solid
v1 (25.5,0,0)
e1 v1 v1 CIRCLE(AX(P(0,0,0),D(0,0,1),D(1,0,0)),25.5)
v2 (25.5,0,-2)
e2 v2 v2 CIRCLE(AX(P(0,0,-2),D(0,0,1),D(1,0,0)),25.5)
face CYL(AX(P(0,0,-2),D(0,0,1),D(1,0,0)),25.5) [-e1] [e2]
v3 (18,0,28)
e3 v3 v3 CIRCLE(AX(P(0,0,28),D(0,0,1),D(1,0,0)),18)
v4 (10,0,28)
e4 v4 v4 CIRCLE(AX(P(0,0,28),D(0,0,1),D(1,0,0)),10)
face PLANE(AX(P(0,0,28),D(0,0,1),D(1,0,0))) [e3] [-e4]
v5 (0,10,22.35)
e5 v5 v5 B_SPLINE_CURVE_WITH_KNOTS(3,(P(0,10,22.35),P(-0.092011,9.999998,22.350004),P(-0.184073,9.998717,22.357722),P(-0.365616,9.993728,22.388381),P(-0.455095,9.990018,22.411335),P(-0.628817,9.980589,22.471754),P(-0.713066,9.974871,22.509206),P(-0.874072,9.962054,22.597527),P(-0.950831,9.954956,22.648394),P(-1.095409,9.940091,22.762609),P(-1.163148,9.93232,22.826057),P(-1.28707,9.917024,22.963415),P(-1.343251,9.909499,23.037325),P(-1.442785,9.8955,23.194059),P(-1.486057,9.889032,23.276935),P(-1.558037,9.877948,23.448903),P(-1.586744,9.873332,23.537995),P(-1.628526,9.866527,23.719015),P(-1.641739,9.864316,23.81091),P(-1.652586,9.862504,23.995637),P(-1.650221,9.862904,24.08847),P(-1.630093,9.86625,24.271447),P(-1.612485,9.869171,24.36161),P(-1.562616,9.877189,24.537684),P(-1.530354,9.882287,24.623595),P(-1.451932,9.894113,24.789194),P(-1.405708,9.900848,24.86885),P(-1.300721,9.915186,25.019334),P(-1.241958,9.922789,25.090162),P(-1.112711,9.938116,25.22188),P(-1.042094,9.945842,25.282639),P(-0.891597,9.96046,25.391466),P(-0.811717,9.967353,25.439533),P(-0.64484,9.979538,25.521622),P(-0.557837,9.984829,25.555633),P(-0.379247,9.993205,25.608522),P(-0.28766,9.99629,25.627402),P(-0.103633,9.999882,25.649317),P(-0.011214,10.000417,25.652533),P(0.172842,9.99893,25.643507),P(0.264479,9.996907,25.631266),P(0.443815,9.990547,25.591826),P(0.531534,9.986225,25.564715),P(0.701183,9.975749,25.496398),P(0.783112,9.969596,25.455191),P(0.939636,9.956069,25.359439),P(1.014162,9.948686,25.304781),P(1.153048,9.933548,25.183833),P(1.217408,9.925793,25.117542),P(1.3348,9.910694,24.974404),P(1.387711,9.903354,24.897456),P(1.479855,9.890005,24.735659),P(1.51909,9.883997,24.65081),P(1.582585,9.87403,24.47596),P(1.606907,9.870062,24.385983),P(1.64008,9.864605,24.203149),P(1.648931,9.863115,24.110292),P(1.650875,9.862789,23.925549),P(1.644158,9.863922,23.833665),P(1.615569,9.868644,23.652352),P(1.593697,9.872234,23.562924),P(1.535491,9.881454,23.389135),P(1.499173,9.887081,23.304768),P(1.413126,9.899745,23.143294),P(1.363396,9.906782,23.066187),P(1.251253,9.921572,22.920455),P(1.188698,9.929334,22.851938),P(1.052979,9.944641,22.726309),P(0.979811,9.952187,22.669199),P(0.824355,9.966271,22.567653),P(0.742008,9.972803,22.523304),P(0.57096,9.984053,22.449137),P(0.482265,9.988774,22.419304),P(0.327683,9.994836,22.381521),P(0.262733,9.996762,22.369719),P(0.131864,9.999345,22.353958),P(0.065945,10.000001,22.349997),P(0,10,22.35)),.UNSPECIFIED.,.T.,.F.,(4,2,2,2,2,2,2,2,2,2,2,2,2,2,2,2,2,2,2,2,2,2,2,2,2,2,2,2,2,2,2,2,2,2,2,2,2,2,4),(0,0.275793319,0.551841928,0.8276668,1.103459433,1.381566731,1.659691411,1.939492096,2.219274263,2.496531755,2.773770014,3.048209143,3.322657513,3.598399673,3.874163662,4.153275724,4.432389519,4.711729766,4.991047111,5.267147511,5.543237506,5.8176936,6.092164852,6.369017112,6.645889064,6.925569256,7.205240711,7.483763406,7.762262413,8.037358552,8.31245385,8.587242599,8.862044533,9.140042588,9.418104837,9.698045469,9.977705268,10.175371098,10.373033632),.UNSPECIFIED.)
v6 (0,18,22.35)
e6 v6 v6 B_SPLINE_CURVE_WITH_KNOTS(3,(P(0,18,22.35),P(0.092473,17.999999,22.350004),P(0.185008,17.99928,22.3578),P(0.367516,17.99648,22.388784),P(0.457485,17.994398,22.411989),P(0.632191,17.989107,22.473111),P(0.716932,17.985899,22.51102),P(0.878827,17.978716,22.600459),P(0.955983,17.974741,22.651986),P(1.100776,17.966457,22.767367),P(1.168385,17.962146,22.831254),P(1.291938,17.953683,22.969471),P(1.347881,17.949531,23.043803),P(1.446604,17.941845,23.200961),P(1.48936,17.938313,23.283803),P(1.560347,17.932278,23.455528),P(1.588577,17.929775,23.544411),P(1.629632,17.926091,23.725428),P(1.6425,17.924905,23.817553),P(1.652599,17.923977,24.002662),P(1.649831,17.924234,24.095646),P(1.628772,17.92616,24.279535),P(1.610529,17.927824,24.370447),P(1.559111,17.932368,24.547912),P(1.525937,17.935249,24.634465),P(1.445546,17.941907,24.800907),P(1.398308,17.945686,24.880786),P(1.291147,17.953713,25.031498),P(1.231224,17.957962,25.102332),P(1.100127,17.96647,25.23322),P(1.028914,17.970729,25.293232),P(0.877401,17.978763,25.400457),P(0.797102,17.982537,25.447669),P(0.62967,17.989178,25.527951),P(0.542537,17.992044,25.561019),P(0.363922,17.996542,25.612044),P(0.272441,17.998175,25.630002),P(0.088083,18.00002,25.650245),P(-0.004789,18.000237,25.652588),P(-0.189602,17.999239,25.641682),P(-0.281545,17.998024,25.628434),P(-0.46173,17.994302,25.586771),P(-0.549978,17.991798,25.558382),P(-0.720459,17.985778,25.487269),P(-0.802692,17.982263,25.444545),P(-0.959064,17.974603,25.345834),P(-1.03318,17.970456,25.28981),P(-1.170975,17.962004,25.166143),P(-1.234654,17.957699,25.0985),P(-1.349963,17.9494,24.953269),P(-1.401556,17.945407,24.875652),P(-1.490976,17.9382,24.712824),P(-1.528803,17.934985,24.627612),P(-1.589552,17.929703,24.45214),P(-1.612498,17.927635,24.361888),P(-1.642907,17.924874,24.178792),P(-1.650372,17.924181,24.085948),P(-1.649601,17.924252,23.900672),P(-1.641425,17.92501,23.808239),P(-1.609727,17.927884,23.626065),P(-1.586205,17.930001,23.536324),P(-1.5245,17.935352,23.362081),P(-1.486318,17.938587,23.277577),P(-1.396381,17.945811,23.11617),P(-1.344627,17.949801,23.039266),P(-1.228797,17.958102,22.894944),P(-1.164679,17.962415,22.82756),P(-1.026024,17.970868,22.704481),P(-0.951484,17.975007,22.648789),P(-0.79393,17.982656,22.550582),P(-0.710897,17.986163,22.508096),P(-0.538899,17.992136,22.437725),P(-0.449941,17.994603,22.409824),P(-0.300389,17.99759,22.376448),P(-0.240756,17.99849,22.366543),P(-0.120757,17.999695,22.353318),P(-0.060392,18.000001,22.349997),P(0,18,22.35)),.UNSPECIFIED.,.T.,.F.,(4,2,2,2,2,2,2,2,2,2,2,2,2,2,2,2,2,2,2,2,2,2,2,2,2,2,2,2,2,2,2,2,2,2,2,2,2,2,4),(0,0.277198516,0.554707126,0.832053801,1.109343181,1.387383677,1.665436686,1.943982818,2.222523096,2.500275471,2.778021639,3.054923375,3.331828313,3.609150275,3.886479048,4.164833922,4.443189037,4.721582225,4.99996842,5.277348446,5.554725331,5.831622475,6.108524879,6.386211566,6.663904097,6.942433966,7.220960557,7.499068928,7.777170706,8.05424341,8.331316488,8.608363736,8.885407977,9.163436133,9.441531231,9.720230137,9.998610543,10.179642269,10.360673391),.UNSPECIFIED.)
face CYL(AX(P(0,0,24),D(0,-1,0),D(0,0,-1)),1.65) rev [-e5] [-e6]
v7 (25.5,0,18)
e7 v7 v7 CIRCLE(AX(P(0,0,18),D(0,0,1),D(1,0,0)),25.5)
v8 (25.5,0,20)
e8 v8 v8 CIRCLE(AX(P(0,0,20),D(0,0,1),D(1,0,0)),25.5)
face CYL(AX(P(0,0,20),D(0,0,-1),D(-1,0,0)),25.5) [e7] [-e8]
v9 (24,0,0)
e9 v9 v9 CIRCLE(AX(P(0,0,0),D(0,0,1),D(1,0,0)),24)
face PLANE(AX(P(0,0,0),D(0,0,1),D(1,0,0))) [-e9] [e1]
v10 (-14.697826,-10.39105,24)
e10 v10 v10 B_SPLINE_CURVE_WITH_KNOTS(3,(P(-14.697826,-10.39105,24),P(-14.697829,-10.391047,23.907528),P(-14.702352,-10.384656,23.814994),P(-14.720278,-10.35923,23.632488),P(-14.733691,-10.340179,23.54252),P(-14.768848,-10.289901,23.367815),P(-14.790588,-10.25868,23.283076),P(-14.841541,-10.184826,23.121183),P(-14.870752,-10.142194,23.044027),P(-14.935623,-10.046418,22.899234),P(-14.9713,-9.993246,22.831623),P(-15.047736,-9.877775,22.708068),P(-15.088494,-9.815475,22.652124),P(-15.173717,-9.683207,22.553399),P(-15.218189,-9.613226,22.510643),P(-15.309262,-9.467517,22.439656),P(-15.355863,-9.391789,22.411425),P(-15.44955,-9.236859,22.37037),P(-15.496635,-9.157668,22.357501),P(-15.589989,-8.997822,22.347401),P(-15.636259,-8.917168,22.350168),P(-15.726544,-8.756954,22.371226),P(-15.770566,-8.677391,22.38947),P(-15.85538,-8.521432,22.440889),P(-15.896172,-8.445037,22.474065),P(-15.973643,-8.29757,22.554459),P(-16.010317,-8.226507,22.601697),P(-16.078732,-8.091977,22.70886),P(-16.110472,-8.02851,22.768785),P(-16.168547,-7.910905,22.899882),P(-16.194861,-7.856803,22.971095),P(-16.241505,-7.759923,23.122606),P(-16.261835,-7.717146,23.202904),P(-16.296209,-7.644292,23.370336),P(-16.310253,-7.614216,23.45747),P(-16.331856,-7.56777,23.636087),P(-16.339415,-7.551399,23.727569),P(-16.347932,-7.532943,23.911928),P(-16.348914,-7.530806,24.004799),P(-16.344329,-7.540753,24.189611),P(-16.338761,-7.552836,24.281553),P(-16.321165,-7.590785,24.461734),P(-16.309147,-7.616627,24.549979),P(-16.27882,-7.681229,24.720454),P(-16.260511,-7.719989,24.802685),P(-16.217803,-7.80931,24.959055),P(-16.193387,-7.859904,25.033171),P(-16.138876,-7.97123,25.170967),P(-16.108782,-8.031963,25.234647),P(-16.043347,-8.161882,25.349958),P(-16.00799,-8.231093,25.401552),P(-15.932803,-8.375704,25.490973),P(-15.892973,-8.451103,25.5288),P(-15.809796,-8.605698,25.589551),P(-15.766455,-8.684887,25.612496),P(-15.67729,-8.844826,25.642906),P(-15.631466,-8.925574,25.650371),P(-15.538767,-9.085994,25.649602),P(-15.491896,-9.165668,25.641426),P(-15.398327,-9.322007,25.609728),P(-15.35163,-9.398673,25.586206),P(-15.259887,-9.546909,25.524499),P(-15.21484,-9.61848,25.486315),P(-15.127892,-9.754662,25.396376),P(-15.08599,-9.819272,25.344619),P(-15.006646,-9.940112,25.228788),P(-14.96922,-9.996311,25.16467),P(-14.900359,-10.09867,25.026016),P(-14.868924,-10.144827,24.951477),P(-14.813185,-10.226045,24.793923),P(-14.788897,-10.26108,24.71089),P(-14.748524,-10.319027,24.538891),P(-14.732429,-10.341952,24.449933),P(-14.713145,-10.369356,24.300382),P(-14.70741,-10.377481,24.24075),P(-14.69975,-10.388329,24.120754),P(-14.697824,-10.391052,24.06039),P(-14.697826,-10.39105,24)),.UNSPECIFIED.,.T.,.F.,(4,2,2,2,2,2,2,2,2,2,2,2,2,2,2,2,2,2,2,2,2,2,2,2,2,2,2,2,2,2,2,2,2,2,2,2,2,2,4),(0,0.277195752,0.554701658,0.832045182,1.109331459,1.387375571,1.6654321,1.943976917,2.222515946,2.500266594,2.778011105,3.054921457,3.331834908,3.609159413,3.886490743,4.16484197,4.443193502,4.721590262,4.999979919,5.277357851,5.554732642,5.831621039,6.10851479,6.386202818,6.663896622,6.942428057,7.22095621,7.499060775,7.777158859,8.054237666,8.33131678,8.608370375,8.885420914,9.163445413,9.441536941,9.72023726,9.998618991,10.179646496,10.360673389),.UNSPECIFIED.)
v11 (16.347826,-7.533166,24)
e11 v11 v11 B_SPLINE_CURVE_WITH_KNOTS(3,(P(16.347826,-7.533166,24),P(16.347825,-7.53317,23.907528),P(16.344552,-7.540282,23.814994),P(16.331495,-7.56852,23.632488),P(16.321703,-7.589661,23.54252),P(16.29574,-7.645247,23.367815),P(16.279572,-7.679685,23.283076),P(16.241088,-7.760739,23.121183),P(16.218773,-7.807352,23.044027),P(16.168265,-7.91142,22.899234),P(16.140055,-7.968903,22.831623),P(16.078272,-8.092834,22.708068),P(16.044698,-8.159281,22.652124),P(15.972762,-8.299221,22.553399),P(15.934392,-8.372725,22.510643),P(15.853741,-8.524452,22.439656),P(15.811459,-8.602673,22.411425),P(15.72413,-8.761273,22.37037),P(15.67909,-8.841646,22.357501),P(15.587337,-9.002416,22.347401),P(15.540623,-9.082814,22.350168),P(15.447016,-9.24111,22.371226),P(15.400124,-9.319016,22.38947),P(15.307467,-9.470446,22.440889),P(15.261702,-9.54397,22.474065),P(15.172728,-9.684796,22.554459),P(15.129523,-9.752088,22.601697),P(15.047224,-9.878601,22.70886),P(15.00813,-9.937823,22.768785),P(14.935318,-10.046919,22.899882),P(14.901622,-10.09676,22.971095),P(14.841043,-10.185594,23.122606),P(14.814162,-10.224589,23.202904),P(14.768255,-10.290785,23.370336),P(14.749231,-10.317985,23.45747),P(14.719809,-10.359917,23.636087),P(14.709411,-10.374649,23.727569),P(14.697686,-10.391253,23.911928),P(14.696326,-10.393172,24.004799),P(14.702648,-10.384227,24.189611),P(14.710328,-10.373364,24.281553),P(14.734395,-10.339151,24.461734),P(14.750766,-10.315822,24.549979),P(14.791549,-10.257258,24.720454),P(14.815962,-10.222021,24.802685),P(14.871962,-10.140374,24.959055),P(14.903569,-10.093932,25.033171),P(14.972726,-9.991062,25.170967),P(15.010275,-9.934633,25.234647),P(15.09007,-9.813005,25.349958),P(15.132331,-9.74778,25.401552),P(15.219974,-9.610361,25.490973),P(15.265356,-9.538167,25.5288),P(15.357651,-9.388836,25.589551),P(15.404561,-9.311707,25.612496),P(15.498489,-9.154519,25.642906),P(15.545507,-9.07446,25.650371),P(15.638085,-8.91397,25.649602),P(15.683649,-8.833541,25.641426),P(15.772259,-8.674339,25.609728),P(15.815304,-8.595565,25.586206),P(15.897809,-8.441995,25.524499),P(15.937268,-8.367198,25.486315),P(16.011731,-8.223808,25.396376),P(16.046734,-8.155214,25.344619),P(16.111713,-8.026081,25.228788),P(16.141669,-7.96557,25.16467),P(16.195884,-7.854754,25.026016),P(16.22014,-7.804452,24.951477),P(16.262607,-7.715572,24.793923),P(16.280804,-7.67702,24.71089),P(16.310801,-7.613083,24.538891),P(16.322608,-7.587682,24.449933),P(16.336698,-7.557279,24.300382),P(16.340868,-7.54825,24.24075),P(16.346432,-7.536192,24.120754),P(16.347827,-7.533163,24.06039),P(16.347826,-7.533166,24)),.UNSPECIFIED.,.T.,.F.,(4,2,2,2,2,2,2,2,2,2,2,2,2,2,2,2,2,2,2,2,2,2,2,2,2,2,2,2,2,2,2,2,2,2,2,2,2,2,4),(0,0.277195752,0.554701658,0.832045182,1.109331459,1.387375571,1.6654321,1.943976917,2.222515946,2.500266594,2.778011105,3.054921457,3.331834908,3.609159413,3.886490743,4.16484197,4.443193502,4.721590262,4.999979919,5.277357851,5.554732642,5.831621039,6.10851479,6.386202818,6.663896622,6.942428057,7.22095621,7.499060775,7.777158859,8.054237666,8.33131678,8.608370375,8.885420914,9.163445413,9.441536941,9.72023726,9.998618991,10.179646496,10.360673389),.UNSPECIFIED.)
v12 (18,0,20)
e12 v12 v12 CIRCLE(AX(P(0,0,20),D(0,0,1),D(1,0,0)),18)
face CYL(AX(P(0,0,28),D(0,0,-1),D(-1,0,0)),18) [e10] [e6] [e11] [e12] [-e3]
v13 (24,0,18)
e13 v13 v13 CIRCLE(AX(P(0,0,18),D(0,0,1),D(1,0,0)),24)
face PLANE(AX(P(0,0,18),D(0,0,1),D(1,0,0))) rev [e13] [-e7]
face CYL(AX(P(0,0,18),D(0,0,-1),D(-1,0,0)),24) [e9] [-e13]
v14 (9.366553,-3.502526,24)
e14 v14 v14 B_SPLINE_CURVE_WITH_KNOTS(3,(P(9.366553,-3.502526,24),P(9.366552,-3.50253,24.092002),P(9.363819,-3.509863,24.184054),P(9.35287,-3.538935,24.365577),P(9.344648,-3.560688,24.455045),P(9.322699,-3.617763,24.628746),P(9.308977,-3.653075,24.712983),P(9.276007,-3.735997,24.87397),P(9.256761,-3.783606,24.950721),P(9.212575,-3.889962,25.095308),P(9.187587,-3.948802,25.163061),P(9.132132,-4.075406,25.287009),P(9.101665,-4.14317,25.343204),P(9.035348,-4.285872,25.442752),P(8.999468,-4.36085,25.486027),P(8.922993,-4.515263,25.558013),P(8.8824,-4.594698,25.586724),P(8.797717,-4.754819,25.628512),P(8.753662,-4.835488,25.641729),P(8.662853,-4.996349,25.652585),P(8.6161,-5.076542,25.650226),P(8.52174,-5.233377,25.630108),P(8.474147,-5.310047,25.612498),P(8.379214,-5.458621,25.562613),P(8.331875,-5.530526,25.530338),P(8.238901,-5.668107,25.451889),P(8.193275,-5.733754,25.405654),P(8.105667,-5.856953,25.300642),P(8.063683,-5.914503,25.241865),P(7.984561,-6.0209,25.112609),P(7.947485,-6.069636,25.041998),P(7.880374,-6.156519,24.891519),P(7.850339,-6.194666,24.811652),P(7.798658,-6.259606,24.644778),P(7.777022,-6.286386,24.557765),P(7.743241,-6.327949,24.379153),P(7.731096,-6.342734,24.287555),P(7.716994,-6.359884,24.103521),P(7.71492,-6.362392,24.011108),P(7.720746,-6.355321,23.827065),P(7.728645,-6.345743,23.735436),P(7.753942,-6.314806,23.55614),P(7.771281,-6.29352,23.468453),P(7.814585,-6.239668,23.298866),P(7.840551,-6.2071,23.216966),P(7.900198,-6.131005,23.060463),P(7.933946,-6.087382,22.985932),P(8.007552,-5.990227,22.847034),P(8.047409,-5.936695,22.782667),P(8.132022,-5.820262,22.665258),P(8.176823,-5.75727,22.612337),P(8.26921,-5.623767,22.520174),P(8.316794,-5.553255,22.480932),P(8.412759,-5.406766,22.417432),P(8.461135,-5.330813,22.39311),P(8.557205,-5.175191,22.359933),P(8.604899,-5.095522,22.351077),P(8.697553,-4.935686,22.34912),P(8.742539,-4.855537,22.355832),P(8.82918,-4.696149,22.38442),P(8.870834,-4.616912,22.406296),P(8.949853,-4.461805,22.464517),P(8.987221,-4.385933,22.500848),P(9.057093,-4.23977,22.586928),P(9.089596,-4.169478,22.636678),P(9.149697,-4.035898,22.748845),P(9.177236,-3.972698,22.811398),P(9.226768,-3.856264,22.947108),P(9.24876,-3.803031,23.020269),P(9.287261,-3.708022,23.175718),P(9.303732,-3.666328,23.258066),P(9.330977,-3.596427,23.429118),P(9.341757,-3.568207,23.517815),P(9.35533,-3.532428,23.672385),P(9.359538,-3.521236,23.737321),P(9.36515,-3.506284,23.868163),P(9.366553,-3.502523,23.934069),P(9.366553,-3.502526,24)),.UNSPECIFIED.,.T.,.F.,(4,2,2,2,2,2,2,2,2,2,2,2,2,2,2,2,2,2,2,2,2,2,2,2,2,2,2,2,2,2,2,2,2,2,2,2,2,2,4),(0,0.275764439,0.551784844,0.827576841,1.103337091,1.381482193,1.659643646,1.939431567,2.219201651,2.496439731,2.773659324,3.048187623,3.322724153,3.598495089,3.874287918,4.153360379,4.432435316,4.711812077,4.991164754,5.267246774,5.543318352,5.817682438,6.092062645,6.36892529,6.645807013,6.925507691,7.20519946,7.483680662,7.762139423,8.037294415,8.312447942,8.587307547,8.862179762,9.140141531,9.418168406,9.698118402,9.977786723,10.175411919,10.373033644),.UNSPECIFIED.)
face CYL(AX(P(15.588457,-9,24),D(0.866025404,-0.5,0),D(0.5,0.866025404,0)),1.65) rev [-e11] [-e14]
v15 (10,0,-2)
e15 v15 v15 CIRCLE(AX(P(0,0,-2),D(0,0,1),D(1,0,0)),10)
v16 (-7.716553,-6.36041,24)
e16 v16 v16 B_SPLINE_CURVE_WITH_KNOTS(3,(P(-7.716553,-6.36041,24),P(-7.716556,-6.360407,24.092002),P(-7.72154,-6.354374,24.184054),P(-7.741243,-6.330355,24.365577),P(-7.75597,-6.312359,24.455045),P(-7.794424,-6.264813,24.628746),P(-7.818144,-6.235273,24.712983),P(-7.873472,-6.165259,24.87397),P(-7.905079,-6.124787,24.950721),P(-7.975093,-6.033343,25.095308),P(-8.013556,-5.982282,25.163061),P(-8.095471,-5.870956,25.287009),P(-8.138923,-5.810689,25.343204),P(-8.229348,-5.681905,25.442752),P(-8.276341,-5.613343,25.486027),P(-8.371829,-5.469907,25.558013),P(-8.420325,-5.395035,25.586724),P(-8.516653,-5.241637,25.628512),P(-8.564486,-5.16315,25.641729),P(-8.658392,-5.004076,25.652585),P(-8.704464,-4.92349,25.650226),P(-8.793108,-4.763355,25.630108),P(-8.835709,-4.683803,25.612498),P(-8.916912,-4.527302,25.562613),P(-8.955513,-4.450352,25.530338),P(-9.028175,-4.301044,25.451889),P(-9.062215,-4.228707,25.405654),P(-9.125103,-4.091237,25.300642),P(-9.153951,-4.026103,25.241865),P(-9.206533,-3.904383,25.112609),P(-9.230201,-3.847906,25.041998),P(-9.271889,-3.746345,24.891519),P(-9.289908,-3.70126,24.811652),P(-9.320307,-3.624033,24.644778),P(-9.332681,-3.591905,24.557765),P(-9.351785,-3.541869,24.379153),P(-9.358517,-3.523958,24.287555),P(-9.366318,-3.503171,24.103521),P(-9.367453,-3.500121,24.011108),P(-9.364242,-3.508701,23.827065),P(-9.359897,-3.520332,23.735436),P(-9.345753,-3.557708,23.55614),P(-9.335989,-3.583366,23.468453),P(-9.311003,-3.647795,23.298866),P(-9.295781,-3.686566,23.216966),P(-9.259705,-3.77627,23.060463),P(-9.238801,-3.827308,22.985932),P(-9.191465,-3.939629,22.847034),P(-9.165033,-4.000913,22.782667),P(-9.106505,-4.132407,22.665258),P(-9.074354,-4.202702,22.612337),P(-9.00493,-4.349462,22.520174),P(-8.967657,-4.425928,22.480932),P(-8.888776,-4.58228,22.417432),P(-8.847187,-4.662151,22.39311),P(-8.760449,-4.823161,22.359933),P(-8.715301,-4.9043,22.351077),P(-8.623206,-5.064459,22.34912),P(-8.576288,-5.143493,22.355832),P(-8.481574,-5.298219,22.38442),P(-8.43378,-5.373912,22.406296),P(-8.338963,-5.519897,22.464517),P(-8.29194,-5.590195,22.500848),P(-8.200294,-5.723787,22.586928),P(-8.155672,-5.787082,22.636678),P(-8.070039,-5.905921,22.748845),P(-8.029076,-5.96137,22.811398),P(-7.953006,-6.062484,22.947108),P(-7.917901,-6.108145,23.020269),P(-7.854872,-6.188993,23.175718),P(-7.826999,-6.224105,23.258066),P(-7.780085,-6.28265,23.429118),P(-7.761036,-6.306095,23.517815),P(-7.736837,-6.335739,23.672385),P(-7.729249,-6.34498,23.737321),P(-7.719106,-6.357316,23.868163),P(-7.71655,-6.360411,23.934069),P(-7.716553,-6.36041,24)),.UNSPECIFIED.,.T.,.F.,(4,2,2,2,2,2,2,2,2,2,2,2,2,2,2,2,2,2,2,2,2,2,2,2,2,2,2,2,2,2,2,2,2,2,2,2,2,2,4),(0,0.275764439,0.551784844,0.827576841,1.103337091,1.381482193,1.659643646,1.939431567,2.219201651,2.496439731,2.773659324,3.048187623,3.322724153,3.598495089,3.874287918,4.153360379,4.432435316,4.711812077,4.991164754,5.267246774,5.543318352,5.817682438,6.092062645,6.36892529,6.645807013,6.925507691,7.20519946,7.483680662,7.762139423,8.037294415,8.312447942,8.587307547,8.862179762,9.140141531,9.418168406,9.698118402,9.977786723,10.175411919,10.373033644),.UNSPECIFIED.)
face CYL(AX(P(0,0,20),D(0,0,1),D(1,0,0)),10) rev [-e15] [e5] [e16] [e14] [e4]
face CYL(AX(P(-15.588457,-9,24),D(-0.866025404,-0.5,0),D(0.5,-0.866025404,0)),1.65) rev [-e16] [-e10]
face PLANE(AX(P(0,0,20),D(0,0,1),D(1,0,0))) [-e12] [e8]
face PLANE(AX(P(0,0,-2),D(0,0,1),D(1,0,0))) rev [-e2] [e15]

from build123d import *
from build123d.topology import SkipClean

# Parameters (mm, degrees)
SKETCH1_R                   = 24
BOSS_EXTRUDE1_DEPTH         = 18
SKETCH2_R                   = 25.5
BOSS_EXTRUDE2_DEPTH         = 2
BOSS_EXTRUDE3_START         = -20
SKETCH2_2_R                 = 25.5
BOSS_EXTRUDE3_DEPTH         = 2
F_20_0MM_DOWEL_HOLE1_D      = 20
SKETCH13_R                  = 18
SKETCH13_R_2                = 10
BOSS_EXTRUDE4_DEPTH         = 8
SKETCH16_W                  = 1.65
SKETCH16_H                  = 25.5
TAP_DRILL_FOR_M4_TAP3_D     = 3.3
TAP_DRILL_FOR_M4_TAP3_DEPTH = 16.83
TAP_DRILL_FOR_M4_TAP3_TIP   = 0.991420021
TAP_DRILL_FOR_M4_TAP4_D     = 3.3
TAP_DRILL_FOR_M4_TAP4_DEPTH = 16.83
TAP_DRILL_FOR_M4_TAP4_TIP   = 0.991420021


with BuildPart() as part:
    # Sketch1 → Boss-Extrude1 (new body)
    with BuildSketch(Plane.XY):
        Circle(SKETCH1_R)
    extrude(amount=BOSS_EXTRUDE1_DEPTH)

    # Sketch2 → Boss-Extrude2 (add)
    with BuildSketch(Plane.XY.offset(18)):
        Circle(SKETCH2_R)
    extrude(amount=BOSS_EXTRUDE2_DEPTH)

    # Sketch2<2> → Boss-Extrude3 (add)
    with BuildSketch(Plane.XY.offset(18).offset(BOSS_EXTRUDE3_START)):
        Circle(SKETCH2_2_R)
    extrude(amount=BOSS_EXTRUDE3_DEPTH)

    # Ø20.0mm Dowel Hole1 (through all)
    with Locations(Plane.XY.offset(20)):
        with Locations((0, 0)):
            Hole(F_20_0MM_DOWEL_HOLE1_D / 2)

    # Sketch13 → Boss-Extrude4 (add)
    with SkipClean():  # the faces are left unmerged after this step: merging them gives an invalid solid
        with BuildSketch(Plane.XY.offset(20)):
            Circle(SKETCH13_R)
            Circle(SKETCH13_R_2, mode=Mode.SUBTRACT)
        extrude(amount=BOSS_EXTRUDE4_DEPTH)
    add(part.part.scale(1), mode=Mode.REPLACE)  # the faces are merged on a copy

    # Sketch16 → Tap Drill for M4 Tap1 (revolve, cut)
    with BuildSketch(Plane(origin=(0, 0, 24), x_dir=(0, 0, -1), z_dir=(1, 0, 0))):
        with Locations((0.825, 12.75)):
            Rectangle(SKETCH16_W, SKETCH16_H)
    revolve(axis=Axis((0, -6.35, 24), (0, 1, 0)), mode=Mode.SUBTRACT)

    # Tap Drill for M4 Tap3
    with Locations(Plane(origin=(-15.588457268, -9, 0), x_dir=(0, 0, -1), z_dir=(-0.8660254037844433, -0.49999999999999195, 0))):
        with Locations((-24, 0)):
            Hole(TAP_DRILL_FOR_M4_TAP3_D / 2, depth=TAP_DRILL_FOR_M4_TAP3_DEPTH)
            with Locations((0, 0, -(TAP_DRILL_FOR_M4_TAP3_DEPTH + TAP_DRILL_FOR_M4_TAP3_TIP / 2))):  # 118° drill point
                Cone(0, TAP_DRILL_FOR_M4_TAP3_D / 2, TAP_DRILL_FOR_M4_TAP3_TIP, mode=Mode.SUBTRACT)

    # Tap Drill for M4 Tap4
    with Locations(Plane(origin=(15.588457268, -9, 0), x_dir=(0, 0, -1), z_dir=(0.8660254037844364, -0.5000000000000041, 0))):
        with Locations((-24, 0)):
            Hole(TAP_DRILL_FOR_M4_TAP4_D / 2, depth=TAP_DRILL_FOR_M4_TAP4_DEPTH)
            with Locations((0, 0, -(TAP_DRILL_FOR_M4_TAP4_DEPTH + TAP_DRILL_FOR_M4_TAP4_TIP / 2))):  # 118° drill point
                Cone(0, TAP_DRILL_FOR_M4_TAP4_D / 2, TAP_DRILL_FOR_M4_TAP4_TIP, mode=Mode.SUBTRACT)


solid = part.part
